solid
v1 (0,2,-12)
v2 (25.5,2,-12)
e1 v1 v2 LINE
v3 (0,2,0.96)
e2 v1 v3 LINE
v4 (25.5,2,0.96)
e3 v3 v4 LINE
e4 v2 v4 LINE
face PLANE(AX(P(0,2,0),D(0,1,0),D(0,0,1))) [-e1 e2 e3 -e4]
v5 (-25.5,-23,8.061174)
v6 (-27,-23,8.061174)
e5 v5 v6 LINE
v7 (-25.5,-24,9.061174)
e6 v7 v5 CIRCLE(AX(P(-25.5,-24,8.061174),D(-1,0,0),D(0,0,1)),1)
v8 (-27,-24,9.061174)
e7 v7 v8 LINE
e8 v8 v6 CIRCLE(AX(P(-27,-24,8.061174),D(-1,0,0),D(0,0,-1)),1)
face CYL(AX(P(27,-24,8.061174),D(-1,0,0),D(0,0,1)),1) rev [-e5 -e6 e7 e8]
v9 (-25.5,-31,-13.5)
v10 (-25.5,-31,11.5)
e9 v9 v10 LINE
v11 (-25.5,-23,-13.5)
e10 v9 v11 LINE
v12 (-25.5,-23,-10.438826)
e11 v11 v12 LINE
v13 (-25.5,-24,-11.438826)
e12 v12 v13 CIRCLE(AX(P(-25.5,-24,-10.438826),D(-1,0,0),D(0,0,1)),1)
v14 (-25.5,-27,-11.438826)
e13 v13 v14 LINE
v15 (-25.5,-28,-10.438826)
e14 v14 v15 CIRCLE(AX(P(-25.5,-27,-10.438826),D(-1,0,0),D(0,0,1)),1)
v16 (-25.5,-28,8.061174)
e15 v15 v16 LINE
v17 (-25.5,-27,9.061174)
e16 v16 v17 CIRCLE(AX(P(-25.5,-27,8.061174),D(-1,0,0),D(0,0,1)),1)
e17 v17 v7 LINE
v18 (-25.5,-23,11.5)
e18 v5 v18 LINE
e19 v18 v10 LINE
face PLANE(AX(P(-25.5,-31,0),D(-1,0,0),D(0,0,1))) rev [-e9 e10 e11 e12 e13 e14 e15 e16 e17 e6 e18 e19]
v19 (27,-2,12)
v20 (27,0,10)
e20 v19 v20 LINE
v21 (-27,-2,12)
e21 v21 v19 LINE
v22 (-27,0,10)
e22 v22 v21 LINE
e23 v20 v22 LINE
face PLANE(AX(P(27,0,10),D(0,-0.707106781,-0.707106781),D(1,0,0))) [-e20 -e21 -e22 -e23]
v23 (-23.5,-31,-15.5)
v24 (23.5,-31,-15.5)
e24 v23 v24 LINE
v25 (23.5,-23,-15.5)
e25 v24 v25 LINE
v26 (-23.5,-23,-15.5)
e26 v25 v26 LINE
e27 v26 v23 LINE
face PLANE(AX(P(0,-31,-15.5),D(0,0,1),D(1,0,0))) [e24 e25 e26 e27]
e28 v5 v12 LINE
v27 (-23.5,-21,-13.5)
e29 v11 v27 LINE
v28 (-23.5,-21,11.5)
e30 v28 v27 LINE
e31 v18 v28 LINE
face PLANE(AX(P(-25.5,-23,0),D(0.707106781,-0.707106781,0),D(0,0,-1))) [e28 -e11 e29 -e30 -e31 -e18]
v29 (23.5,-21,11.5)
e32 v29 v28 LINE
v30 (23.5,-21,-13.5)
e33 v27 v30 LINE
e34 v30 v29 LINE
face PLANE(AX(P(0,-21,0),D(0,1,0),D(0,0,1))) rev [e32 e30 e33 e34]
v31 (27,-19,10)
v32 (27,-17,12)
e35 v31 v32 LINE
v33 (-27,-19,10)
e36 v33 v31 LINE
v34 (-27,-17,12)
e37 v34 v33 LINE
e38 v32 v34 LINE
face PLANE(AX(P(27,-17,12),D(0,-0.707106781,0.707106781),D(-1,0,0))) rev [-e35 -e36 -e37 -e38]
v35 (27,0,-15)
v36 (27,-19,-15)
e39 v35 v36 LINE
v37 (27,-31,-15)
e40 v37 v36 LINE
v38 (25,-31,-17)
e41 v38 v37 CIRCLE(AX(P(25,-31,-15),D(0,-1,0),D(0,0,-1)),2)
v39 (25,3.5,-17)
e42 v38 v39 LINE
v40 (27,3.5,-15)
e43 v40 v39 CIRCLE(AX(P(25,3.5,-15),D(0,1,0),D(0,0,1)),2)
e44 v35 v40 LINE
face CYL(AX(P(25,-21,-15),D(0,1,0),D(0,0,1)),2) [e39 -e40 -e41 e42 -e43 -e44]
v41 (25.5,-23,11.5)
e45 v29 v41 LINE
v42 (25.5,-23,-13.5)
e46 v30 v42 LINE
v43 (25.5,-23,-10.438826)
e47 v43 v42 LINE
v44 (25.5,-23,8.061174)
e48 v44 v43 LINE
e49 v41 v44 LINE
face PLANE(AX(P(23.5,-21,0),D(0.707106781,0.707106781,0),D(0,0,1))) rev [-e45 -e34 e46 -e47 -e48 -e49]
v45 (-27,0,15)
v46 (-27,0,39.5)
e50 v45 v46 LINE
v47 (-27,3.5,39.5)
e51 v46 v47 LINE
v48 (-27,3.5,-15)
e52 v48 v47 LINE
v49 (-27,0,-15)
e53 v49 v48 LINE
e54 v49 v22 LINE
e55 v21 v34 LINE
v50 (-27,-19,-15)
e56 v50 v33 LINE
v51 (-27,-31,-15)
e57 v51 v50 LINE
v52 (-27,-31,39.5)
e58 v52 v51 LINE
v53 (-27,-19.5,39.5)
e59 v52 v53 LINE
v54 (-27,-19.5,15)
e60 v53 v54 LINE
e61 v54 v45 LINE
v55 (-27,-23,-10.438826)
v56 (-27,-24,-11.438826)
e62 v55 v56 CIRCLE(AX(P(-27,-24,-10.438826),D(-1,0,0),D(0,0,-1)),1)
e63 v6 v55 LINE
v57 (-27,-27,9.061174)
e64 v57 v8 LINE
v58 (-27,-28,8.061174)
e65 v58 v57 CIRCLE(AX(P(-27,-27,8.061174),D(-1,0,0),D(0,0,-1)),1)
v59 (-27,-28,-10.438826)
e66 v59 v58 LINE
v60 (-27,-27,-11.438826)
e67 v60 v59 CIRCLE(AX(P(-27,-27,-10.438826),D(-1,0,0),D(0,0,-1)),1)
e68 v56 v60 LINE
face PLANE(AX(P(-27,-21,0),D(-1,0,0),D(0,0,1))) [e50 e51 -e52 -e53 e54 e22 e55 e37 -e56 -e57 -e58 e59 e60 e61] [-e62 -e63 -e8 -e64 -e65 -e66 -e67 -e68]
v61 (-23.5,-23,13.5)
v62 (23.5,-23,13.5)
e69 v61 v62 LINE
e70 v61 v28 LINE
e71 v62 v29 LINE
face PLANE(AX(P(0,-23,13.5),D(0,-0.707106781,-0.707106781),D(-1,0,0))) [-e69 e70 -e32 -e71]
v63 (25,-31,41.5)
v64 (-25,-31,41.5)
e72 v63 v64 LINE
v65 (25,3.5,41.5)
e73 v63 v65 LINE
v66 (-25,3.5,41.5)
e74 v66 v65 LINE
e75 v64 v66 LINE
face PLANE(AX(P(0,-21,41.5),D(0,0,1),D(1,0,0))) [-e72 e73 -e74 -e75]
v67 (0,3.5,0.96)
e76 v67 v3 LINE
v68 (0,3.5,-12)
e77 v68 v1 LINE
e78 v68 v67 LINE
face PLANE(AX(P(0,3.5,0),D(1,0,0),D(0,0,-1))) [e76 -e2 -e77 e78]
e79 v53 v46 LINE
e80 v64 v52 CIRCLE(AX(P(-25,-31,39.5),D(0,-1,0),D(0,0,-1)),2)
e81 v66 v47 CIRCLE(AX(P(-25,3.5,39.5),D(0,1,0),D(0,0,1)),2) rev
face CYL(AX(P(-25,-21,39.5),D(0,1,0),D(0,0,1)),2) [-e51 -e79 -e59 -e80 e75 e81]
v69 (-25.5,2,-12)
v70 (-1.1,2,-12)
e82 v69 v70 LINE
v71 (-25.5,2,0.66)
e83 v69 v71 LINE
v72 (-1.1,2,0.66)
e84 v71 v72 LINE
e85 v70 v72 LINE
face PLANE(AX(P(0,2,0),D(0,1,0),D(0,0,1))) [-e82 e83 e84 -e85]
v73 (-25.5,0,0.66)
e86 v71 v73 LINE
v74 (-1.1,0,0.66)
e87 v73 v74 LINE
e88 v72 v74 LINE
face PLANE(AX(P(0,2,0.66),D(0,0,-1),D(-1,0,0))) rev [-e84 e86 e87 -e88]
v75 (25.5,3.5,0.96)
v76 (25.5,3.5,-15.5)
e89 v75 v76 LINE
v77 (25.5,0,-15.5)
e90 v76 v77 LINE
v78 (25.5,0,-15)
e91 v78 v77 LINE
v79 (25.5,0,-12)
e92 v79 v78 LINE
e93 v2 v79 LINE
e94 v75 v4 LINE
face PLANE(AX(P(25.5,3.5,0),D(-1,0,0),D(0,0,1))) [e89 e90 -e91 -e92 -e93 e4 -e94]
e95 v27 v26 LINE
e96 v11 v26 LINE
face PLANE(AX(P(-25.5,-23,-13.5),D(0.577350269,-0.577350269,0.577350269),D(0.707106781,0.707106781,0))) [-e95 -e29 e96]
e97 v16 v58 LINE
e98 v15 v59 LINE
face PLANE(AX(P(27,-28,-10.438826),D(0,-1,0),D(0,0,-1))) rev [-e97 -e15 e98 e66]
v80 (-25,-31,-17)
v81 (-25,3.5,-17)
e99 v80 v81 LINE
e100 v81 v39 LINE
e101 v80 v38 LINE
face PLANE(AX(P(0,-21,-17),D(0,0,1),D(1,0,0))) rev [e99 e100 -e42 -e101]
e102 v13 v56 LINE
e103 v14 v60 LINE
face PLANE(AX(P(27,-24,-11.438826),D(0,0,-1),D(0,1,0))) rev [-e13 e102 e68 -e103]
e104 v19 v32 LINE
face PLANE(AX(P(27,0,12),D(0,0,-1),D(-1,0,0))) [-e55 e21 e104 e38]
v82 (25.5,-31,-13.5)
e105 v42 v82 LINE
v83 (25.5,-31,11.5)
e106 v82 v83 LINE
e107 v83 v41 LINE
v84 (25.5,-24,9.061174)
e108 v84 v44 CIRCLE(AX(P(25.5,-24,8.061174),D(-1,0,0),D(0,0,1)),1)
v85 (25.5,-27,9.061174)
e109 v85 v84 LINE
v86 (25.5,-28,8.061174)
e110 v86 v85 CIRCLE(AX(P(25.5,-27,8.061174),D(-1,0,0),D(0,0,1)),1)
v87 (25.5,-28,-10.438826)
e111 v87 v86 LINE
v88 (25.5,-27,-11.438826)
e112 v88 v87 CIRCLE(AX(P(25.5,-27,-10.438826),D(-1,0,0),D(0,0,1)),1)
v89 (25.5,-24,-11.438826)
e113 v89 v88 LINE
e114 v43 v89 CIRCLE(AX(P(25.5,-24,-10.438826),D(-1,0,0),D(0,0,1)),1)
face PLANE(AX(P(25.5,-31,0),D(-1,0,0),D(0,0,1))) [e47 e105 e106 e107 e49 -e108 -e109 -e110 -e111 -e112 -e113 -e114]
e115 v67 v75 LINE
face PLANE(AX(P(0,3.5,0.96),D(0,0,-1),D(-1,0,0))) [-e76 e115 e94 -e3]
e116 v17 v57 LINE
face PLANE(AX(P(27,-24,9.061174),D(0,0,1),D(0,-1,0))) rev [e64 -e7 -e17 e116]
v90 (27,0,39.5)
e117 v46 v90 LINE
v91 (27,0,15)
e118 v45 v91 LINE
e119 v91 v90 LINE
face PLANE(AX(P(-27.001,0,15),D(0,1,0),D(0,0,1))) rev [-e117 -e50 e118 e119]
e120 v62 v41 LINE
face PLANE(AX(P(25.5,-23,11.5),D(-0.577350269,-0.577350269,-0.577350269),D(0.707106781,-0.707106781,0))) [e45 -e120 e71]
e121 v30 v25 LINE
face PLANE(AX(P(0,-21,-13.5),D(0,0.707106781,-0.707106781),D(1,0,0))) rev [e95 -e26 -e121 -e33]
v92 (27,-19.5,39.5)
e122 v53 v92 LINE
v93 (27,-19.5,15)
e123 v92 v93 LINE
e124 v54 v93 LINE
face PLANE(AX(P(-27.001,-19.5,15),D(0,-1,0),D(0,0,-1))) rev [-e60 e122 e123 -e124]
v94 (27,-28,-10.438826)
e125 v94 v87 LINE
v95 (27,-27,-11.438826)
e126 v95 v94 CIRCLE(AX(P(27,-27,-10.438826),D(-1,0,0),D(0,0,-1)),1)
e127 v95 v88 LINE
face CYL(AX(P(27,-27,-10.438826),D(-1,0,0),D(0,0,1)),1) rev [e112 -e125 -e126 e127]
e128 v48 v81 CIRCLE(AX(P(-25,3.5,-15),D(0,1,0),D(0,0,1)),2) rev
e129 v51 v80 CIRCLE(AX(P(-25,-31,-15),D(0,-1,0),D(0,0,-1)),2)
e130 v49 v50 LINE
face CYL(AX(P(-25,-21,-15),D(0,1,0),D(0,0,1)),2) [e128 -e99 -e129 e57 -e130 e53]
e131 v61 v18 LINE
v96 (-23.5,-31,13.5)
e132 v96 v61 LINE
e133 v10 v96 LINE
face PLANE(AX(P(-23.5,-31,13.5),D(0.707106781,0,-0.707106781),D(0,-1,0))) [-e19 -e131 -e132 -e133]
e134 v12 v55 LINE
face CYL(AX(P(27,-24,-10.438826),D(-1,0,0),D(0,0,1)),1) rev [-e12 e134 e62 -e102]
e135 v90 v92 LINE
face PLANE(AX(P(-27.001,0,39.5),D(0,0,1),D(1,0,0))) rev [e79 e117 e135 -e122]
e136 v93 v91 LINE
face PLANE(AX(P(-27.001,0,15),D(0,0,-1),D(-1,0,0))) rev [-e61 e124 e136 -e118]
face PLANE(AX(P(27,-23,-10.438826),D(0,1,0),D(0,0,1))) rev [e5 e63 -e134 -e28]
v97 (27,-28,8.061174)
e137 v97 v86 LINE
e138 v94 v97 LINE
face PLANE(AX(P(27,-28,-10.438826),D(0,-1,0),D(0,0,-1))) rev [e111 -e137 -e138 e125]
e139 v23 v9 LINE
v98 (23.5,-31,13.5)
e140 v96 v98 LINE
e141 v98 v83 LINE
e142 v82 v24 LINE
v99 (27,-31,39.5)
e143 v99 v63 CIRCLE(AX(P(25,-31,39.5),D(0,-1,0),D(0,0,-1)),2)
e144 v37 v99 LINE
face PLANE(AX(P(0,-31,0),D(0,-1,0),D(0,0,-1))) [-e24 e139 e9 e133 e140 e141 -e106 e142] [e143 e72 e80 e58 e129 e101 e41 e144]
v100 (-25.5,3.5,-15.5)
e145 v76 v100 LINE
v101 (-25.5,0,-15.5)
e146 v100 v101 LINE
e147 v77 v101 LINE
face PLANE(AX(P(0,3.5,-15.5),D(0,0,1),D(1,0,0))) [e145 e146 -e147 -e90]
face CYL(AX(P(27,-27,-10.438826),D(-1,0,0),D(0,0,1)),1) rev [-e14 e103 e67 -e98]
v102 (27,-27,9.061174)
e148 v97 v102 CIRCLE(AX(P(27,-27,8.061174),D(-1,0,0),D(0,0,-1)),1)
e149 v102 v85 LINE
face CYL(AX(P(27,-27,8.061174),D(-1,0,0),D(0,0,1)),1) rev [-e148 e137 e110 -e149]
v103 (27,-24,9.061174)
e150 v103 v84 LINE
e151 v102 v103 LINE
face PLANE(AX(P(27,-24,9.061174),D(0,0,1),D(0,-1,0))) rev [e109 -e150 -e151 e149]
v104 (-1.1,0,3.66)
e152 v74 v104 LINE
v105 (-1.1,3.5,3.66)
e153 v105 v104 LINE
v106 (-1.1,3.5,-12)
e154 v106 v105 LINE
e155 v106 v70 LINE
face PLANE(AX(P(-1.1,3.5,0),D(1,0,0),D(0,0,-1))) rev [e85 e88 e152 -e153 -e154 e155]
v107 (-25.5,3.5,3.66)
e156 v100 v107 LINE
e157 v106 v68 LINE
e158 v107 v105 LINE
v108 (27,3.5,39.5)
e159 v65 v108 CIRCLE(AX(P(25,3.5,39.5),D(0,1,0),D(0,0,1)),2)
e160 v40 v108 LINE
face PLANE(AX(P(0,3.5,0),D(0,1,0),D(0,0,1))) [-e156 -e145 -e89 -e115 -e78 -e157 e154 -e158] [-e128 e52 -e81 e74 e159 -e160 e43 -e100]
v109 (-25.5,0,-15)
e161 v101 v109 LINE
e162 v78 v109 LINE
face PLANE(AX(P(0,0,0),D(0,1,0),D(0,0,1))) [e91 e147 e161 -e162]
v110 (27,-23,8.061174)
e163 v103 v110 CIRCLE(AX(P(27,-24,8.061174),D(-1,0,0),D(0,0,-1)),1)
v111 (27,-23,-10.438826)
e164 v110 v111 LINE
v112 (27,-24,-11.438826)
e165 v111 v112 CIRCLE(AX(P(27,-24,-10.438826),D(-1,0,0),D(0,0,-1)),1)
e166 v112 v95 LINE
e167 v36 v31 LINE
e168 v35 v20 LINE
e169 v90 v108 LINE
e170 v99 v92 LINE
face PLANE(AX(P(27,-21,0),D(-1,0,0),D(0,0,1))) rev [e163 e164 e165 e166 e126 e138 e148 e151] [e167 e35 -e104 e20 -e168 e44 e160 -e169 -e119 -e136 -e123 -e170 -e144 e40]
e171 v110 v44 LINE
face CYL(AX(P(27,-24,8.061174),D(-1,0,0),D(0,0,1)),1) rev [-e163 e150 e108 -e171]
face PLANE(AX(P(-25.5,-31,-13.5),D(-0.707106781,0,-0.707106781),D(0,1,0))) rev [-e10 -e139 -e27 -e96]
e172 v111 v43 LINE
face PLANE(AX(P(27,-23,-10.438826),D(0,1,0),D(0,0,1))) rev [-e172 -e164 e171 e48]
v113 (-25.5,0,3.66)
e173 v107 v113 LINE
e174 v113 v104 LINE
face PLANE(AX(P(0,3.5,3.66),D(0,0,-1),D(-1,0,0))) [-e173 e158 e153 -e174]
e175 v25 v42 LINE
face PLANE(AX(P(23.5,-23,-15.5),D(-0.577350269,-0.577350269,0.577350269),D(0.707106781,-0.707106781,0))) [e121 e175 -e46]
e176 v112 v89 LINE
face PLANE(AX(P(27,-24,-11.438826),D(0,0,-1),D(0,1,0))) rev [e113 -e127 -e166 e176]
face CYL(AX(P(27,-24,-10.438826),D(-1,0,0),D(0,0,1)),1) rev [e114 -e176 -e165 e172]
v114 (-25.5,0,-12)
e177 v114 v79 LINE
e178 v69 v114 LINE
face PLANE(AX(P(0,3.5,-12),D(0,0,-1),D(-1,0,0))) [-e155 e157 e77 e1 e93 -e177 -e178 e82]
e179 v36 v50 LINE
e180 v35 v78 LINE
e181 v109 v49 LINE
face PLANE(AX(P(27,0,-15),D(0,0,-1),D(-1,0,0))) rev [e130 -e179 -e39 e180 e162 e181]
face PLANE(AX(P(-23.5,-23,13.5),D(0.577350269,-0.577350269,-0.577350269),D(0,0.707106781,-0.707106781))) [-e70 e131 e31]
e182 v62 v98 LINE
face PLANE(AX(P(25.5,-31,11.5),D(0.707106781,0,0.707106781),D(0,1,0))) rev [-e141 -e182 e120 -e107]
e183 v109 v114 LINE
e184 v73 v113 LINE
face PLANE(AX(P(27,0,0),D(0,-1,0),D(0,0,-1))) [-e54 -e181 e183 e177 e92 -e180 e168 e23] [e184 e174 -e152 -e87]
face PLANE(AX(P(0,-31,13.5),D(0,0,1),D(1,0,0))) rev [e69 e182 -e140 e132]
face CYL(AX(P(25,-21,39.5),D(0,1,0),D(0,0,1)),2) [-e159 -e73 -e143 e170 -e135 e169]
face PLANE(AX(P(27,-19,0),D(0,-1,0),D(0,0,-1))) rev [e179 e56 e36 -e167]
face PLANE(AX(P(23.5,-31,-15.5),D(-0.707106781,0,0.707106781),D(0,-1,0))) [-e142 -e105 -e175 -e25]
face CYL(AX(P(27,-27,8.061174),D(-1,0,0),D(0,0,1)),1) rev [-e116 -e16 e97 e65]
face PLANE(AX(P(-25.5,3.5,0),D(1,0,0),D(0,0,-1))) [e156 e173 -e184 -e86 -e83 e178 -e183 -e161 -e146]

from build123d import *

# Parameters (mm, degrees)
BOSS_EXTRUDE4_DEPTH = 21
BOSS_EXTRUDE5_START = 3.5
BOSS_EXTRUDE5_DEPTH = 3.5
SKETCH4_W           = 27
SKETCH4_H           = 19
CUT_EXTRUDE4_DEPTH  = 72.268857154
SKETCH3_5_W         = 24.4
SKETCH3_5_H         = 12.66
BOSS_EXTRUDE6_DEPTH = 2
SKETCH5_W           = 51
SKETCH5_H           = 29
BOSS_EXTRUDE7_DEPTH = 10
CUT_EXTRUDE5_DEPTH  = 75.828136419
CUT_EXTRUDE6_REACH  = 76.828
SKETCH8_W           = 24.5
SKETCH8_H           = 19.5
CHAMFER1_SIZE       = 2


with BuildPart() as part:
    # Sketch3 → Boss-Extrude4 (new body)
    with BuildSketch(Plane(origin=(0, 0, 0), x_dir=(1, 0, 0), z_dir=(0, 1, 0))):
        with BuildLine():
            Line((-27, 15), (-27, -39.5))
            ThreePointArc((-27, -39.5), (-26.414213562, -40.914213562), (-25, -41.5))
            Line((-25, -41.5), (25, -41.5))
            ThreePointArc((25, -41.5), (26.414213562, -40.914213562), (27, -39.5))
            Line((27, -39.5), (27, 15))
            ThreePointArc((27, 15), (26.414213562, 16.414213562), (25, 17))
            Line((25, 17), (-25, 17))
            ThreePointArc((-25, 17), (-26.414213562, 16.414213562), (-27, 15))
        make_face()
    extrude(amount=-BOSS_EXTRUDE4_DEPTH)

    # Sketch3<3> → Boss-Extrude5 (add)
    with BuildSketch(Plane(origin=(0, 0, 0), x_dir=(1, 0, 0), z_dir=(0, 1, 0)).offset(BOSS_EXTRUDE5_START)):
        with BuildLine():
            Line((-27, 15), (-27, -39.5))
            ThreePointArc((-27, -39.5), (-26.414213562, -40.914213562), (-25, -41.5))
            Line((-25, -41.5), (25, -41.5))
            ThreePointArc((25, -41.5), (26.414213562, -40.914213562), (27, -39.5))
            Line((27, -39.5), (27, 15))
            ThreePointArc((27, 15), (26.414213562, 16.414213562), (25, 17))
            Line((25, 17), (-25, 17))
            ThreePointArc((-25, 17), (-26.414213562, 16.414213562), (-27, 15))
        make_face()
        Polygon((0, 12), (-1.1, 12), (-1.1, -3.66), (-25.5, -3.66), (-25.5, 15.5), (25.5, 15.5), (25.5, -0.96), (0, -0.96), align=None, mode=Mode.SUBTRACT)
    extrude(amount=-BOSS_EXTRUDE5_DEPTH)

    # Sketch4 → Cut-Extrude4 (cut, through all)
    with BuildSketch(Plane.ZY.offset(27)):
        with Locations((-1.5, -9.5)):
            Rectangle(SKETCH4_W, SKETCH4_H)
    extrude(amount=-CUT_EXTRUDE4_DEPTH, mode=Mode.SUBTRACT)

    # Sketch3<5> → Boss-Extrude6 (add)
    with BuildSketch(Plane(origin=(0, 0, 0), x_dir=(1, 0, 0), z_dir=(0, 1, 0))):
        with Locations((-13.3, 5.67)):
            Rectangle(SKETCH3_5_W, SKETCH3_5_H)
        Polygon((25.5, 12), (0, 12), (0, -0.96), (25.5, -0.96), (25.5, -0.5), align=None)
    extrude(amount=BOSS_EXTRUDE6_DEPTH)

    # Sketch5 → Boss-Extrude7 (add)
    # profile 1 of 2: a face of its own
    with BuildSketch(Plane.XZ.offset(21)):
        with BuildLine():
            ThreePointArc((25, -17), (26.414213562, -16.414213562), (27, -15))
            Line((27, -15), (27, 39.5))
            ThreePointArc((27, 39.5), (26.414213562, 40.914213562), (25, 41.5))
            Line((25, 41.5), (-25, 41.5))
            ThreePointArc((-25, 41.5), (-26.414213562, 40.914213562), (-27, 39.5))
            Line((-27, 39.5), (-27, -15))
            ThreePointArc((-27, -15), (-26.414213562, -16.414213562), (-25, -17))
            Line((-25, -17), (25, -17))
        make_face()
        with Locations((0, -1)):
            Rectangle(SKETCH5_W, SKETCH5_H, mode=Mode.SUBTRACT)
    # profile 2 of 2: a face of its own
    with BuildSketch(Plane.XZ.offset(21)):
        with BuildLine():
            ThreePointArc((25, -17), (26.414213562, -16.414213562), (27, -15))
            Line((27, -15), (27, 39.5))
            ThreePointArc((27, 39.5), (26.414213562, 40.914213562), (25, 41.5))
            Line((25, 41.5), (-25, 41.5))
            ThreePointArc((-25, 41.5), (-26.414213562, 40.914213562), (-27, 39.5))
            Line((-27, 39.5), (-27, -15))
            ThreePointArc((-27, -15), (-26.414213562, -16.414213562), (-25, -17))
            Line((-25, -17), (25, -17))
        make_face()
        with Locations((0, -1)):
            Rectangle(SKETCH5_W, SKETCH5_H, mode=Mode.SUBTRACT)
    extrude(amount=BOSS_EXTRUDE7_DEPTH)

    # Sketch6 → Cut-Extrude5 (cut, through all)
    with BuildSketch(Plane.ZY.offset(27)):
        with BuildLine():
            Line((-10.438825699, -23), (8.061174301, -23))
            ThreePointArc((8.061174301, -23), (8.768281082, -23.292893219), (9.061174301, -24))
            Line((9.061174301, -24), (9.061174301, -27))
            ThreePointArc((9.061174301, -27), (8.768281082, -27.707106781), (8.061174301, -28))
            Line((8.061174301, -28), (-10.438825699, -28))
            ThreePointArc((-10.438825699, -28), (-11.14593248, -27.707106781), (-11.438825699, -27))
            Line((-11.438825699, -27), (-11.438825699, -24))
            ThreePointArc((-11.438825699, -24), (-11.14593248, -23.292893219), (-10.438825699, -23))
        make_face()
    extrude(amount=-CUT_EXTRUDE5_DEPTH, mode=Mode.SUBTRACT)

    # Sketch8 → Cut-Extrude6 (cut, up to next)
    with BuildSketch(Plane(origin=(27, 0, 0), x_dir=(0, 0, -1), z_dir=(1, 0, 0)), mode=Mode.PRIVATE) as cut_extrude6_sk1:
        with Locations((-27.25, -9.75)):
            Rectangle(SKETCH8_W, SKETCH8_H)
    cut_extrude6_tool1 = extrude(cut_extrude6_sk1.sketch, amount=-CUT_EXTRUDE6_REACH, mode=Mode.PRIVATE) & part.part
    add(cut_extrude6_tool1.solids().sort_by_distance((27, -9.75, 27.25))[0], mode=Mode.SUBTRACT)

    # Chamfer1
    chamfer1_edges = [part.edges().sort_by_distance(p)[0] for p in [
        (25.5, -26, -15.5),
        (-25.5, -21, -1),
        (-25.5, -26, -15.5),
        (0, -21, 13.5),
        (-25.5, -26, 13.5),
        (25.5, -26, 13.5),
        (0, -21, -15.5),
        (25.5, -21, -1),
        (0, 0, 12),
        (0, -19, 12),
    ]]
    chamfer(chamfer1_edges, length=CHAMFER1_SIZE - 0.0001)  # a hair under: the kernel refuses the full size


solid = part.part
